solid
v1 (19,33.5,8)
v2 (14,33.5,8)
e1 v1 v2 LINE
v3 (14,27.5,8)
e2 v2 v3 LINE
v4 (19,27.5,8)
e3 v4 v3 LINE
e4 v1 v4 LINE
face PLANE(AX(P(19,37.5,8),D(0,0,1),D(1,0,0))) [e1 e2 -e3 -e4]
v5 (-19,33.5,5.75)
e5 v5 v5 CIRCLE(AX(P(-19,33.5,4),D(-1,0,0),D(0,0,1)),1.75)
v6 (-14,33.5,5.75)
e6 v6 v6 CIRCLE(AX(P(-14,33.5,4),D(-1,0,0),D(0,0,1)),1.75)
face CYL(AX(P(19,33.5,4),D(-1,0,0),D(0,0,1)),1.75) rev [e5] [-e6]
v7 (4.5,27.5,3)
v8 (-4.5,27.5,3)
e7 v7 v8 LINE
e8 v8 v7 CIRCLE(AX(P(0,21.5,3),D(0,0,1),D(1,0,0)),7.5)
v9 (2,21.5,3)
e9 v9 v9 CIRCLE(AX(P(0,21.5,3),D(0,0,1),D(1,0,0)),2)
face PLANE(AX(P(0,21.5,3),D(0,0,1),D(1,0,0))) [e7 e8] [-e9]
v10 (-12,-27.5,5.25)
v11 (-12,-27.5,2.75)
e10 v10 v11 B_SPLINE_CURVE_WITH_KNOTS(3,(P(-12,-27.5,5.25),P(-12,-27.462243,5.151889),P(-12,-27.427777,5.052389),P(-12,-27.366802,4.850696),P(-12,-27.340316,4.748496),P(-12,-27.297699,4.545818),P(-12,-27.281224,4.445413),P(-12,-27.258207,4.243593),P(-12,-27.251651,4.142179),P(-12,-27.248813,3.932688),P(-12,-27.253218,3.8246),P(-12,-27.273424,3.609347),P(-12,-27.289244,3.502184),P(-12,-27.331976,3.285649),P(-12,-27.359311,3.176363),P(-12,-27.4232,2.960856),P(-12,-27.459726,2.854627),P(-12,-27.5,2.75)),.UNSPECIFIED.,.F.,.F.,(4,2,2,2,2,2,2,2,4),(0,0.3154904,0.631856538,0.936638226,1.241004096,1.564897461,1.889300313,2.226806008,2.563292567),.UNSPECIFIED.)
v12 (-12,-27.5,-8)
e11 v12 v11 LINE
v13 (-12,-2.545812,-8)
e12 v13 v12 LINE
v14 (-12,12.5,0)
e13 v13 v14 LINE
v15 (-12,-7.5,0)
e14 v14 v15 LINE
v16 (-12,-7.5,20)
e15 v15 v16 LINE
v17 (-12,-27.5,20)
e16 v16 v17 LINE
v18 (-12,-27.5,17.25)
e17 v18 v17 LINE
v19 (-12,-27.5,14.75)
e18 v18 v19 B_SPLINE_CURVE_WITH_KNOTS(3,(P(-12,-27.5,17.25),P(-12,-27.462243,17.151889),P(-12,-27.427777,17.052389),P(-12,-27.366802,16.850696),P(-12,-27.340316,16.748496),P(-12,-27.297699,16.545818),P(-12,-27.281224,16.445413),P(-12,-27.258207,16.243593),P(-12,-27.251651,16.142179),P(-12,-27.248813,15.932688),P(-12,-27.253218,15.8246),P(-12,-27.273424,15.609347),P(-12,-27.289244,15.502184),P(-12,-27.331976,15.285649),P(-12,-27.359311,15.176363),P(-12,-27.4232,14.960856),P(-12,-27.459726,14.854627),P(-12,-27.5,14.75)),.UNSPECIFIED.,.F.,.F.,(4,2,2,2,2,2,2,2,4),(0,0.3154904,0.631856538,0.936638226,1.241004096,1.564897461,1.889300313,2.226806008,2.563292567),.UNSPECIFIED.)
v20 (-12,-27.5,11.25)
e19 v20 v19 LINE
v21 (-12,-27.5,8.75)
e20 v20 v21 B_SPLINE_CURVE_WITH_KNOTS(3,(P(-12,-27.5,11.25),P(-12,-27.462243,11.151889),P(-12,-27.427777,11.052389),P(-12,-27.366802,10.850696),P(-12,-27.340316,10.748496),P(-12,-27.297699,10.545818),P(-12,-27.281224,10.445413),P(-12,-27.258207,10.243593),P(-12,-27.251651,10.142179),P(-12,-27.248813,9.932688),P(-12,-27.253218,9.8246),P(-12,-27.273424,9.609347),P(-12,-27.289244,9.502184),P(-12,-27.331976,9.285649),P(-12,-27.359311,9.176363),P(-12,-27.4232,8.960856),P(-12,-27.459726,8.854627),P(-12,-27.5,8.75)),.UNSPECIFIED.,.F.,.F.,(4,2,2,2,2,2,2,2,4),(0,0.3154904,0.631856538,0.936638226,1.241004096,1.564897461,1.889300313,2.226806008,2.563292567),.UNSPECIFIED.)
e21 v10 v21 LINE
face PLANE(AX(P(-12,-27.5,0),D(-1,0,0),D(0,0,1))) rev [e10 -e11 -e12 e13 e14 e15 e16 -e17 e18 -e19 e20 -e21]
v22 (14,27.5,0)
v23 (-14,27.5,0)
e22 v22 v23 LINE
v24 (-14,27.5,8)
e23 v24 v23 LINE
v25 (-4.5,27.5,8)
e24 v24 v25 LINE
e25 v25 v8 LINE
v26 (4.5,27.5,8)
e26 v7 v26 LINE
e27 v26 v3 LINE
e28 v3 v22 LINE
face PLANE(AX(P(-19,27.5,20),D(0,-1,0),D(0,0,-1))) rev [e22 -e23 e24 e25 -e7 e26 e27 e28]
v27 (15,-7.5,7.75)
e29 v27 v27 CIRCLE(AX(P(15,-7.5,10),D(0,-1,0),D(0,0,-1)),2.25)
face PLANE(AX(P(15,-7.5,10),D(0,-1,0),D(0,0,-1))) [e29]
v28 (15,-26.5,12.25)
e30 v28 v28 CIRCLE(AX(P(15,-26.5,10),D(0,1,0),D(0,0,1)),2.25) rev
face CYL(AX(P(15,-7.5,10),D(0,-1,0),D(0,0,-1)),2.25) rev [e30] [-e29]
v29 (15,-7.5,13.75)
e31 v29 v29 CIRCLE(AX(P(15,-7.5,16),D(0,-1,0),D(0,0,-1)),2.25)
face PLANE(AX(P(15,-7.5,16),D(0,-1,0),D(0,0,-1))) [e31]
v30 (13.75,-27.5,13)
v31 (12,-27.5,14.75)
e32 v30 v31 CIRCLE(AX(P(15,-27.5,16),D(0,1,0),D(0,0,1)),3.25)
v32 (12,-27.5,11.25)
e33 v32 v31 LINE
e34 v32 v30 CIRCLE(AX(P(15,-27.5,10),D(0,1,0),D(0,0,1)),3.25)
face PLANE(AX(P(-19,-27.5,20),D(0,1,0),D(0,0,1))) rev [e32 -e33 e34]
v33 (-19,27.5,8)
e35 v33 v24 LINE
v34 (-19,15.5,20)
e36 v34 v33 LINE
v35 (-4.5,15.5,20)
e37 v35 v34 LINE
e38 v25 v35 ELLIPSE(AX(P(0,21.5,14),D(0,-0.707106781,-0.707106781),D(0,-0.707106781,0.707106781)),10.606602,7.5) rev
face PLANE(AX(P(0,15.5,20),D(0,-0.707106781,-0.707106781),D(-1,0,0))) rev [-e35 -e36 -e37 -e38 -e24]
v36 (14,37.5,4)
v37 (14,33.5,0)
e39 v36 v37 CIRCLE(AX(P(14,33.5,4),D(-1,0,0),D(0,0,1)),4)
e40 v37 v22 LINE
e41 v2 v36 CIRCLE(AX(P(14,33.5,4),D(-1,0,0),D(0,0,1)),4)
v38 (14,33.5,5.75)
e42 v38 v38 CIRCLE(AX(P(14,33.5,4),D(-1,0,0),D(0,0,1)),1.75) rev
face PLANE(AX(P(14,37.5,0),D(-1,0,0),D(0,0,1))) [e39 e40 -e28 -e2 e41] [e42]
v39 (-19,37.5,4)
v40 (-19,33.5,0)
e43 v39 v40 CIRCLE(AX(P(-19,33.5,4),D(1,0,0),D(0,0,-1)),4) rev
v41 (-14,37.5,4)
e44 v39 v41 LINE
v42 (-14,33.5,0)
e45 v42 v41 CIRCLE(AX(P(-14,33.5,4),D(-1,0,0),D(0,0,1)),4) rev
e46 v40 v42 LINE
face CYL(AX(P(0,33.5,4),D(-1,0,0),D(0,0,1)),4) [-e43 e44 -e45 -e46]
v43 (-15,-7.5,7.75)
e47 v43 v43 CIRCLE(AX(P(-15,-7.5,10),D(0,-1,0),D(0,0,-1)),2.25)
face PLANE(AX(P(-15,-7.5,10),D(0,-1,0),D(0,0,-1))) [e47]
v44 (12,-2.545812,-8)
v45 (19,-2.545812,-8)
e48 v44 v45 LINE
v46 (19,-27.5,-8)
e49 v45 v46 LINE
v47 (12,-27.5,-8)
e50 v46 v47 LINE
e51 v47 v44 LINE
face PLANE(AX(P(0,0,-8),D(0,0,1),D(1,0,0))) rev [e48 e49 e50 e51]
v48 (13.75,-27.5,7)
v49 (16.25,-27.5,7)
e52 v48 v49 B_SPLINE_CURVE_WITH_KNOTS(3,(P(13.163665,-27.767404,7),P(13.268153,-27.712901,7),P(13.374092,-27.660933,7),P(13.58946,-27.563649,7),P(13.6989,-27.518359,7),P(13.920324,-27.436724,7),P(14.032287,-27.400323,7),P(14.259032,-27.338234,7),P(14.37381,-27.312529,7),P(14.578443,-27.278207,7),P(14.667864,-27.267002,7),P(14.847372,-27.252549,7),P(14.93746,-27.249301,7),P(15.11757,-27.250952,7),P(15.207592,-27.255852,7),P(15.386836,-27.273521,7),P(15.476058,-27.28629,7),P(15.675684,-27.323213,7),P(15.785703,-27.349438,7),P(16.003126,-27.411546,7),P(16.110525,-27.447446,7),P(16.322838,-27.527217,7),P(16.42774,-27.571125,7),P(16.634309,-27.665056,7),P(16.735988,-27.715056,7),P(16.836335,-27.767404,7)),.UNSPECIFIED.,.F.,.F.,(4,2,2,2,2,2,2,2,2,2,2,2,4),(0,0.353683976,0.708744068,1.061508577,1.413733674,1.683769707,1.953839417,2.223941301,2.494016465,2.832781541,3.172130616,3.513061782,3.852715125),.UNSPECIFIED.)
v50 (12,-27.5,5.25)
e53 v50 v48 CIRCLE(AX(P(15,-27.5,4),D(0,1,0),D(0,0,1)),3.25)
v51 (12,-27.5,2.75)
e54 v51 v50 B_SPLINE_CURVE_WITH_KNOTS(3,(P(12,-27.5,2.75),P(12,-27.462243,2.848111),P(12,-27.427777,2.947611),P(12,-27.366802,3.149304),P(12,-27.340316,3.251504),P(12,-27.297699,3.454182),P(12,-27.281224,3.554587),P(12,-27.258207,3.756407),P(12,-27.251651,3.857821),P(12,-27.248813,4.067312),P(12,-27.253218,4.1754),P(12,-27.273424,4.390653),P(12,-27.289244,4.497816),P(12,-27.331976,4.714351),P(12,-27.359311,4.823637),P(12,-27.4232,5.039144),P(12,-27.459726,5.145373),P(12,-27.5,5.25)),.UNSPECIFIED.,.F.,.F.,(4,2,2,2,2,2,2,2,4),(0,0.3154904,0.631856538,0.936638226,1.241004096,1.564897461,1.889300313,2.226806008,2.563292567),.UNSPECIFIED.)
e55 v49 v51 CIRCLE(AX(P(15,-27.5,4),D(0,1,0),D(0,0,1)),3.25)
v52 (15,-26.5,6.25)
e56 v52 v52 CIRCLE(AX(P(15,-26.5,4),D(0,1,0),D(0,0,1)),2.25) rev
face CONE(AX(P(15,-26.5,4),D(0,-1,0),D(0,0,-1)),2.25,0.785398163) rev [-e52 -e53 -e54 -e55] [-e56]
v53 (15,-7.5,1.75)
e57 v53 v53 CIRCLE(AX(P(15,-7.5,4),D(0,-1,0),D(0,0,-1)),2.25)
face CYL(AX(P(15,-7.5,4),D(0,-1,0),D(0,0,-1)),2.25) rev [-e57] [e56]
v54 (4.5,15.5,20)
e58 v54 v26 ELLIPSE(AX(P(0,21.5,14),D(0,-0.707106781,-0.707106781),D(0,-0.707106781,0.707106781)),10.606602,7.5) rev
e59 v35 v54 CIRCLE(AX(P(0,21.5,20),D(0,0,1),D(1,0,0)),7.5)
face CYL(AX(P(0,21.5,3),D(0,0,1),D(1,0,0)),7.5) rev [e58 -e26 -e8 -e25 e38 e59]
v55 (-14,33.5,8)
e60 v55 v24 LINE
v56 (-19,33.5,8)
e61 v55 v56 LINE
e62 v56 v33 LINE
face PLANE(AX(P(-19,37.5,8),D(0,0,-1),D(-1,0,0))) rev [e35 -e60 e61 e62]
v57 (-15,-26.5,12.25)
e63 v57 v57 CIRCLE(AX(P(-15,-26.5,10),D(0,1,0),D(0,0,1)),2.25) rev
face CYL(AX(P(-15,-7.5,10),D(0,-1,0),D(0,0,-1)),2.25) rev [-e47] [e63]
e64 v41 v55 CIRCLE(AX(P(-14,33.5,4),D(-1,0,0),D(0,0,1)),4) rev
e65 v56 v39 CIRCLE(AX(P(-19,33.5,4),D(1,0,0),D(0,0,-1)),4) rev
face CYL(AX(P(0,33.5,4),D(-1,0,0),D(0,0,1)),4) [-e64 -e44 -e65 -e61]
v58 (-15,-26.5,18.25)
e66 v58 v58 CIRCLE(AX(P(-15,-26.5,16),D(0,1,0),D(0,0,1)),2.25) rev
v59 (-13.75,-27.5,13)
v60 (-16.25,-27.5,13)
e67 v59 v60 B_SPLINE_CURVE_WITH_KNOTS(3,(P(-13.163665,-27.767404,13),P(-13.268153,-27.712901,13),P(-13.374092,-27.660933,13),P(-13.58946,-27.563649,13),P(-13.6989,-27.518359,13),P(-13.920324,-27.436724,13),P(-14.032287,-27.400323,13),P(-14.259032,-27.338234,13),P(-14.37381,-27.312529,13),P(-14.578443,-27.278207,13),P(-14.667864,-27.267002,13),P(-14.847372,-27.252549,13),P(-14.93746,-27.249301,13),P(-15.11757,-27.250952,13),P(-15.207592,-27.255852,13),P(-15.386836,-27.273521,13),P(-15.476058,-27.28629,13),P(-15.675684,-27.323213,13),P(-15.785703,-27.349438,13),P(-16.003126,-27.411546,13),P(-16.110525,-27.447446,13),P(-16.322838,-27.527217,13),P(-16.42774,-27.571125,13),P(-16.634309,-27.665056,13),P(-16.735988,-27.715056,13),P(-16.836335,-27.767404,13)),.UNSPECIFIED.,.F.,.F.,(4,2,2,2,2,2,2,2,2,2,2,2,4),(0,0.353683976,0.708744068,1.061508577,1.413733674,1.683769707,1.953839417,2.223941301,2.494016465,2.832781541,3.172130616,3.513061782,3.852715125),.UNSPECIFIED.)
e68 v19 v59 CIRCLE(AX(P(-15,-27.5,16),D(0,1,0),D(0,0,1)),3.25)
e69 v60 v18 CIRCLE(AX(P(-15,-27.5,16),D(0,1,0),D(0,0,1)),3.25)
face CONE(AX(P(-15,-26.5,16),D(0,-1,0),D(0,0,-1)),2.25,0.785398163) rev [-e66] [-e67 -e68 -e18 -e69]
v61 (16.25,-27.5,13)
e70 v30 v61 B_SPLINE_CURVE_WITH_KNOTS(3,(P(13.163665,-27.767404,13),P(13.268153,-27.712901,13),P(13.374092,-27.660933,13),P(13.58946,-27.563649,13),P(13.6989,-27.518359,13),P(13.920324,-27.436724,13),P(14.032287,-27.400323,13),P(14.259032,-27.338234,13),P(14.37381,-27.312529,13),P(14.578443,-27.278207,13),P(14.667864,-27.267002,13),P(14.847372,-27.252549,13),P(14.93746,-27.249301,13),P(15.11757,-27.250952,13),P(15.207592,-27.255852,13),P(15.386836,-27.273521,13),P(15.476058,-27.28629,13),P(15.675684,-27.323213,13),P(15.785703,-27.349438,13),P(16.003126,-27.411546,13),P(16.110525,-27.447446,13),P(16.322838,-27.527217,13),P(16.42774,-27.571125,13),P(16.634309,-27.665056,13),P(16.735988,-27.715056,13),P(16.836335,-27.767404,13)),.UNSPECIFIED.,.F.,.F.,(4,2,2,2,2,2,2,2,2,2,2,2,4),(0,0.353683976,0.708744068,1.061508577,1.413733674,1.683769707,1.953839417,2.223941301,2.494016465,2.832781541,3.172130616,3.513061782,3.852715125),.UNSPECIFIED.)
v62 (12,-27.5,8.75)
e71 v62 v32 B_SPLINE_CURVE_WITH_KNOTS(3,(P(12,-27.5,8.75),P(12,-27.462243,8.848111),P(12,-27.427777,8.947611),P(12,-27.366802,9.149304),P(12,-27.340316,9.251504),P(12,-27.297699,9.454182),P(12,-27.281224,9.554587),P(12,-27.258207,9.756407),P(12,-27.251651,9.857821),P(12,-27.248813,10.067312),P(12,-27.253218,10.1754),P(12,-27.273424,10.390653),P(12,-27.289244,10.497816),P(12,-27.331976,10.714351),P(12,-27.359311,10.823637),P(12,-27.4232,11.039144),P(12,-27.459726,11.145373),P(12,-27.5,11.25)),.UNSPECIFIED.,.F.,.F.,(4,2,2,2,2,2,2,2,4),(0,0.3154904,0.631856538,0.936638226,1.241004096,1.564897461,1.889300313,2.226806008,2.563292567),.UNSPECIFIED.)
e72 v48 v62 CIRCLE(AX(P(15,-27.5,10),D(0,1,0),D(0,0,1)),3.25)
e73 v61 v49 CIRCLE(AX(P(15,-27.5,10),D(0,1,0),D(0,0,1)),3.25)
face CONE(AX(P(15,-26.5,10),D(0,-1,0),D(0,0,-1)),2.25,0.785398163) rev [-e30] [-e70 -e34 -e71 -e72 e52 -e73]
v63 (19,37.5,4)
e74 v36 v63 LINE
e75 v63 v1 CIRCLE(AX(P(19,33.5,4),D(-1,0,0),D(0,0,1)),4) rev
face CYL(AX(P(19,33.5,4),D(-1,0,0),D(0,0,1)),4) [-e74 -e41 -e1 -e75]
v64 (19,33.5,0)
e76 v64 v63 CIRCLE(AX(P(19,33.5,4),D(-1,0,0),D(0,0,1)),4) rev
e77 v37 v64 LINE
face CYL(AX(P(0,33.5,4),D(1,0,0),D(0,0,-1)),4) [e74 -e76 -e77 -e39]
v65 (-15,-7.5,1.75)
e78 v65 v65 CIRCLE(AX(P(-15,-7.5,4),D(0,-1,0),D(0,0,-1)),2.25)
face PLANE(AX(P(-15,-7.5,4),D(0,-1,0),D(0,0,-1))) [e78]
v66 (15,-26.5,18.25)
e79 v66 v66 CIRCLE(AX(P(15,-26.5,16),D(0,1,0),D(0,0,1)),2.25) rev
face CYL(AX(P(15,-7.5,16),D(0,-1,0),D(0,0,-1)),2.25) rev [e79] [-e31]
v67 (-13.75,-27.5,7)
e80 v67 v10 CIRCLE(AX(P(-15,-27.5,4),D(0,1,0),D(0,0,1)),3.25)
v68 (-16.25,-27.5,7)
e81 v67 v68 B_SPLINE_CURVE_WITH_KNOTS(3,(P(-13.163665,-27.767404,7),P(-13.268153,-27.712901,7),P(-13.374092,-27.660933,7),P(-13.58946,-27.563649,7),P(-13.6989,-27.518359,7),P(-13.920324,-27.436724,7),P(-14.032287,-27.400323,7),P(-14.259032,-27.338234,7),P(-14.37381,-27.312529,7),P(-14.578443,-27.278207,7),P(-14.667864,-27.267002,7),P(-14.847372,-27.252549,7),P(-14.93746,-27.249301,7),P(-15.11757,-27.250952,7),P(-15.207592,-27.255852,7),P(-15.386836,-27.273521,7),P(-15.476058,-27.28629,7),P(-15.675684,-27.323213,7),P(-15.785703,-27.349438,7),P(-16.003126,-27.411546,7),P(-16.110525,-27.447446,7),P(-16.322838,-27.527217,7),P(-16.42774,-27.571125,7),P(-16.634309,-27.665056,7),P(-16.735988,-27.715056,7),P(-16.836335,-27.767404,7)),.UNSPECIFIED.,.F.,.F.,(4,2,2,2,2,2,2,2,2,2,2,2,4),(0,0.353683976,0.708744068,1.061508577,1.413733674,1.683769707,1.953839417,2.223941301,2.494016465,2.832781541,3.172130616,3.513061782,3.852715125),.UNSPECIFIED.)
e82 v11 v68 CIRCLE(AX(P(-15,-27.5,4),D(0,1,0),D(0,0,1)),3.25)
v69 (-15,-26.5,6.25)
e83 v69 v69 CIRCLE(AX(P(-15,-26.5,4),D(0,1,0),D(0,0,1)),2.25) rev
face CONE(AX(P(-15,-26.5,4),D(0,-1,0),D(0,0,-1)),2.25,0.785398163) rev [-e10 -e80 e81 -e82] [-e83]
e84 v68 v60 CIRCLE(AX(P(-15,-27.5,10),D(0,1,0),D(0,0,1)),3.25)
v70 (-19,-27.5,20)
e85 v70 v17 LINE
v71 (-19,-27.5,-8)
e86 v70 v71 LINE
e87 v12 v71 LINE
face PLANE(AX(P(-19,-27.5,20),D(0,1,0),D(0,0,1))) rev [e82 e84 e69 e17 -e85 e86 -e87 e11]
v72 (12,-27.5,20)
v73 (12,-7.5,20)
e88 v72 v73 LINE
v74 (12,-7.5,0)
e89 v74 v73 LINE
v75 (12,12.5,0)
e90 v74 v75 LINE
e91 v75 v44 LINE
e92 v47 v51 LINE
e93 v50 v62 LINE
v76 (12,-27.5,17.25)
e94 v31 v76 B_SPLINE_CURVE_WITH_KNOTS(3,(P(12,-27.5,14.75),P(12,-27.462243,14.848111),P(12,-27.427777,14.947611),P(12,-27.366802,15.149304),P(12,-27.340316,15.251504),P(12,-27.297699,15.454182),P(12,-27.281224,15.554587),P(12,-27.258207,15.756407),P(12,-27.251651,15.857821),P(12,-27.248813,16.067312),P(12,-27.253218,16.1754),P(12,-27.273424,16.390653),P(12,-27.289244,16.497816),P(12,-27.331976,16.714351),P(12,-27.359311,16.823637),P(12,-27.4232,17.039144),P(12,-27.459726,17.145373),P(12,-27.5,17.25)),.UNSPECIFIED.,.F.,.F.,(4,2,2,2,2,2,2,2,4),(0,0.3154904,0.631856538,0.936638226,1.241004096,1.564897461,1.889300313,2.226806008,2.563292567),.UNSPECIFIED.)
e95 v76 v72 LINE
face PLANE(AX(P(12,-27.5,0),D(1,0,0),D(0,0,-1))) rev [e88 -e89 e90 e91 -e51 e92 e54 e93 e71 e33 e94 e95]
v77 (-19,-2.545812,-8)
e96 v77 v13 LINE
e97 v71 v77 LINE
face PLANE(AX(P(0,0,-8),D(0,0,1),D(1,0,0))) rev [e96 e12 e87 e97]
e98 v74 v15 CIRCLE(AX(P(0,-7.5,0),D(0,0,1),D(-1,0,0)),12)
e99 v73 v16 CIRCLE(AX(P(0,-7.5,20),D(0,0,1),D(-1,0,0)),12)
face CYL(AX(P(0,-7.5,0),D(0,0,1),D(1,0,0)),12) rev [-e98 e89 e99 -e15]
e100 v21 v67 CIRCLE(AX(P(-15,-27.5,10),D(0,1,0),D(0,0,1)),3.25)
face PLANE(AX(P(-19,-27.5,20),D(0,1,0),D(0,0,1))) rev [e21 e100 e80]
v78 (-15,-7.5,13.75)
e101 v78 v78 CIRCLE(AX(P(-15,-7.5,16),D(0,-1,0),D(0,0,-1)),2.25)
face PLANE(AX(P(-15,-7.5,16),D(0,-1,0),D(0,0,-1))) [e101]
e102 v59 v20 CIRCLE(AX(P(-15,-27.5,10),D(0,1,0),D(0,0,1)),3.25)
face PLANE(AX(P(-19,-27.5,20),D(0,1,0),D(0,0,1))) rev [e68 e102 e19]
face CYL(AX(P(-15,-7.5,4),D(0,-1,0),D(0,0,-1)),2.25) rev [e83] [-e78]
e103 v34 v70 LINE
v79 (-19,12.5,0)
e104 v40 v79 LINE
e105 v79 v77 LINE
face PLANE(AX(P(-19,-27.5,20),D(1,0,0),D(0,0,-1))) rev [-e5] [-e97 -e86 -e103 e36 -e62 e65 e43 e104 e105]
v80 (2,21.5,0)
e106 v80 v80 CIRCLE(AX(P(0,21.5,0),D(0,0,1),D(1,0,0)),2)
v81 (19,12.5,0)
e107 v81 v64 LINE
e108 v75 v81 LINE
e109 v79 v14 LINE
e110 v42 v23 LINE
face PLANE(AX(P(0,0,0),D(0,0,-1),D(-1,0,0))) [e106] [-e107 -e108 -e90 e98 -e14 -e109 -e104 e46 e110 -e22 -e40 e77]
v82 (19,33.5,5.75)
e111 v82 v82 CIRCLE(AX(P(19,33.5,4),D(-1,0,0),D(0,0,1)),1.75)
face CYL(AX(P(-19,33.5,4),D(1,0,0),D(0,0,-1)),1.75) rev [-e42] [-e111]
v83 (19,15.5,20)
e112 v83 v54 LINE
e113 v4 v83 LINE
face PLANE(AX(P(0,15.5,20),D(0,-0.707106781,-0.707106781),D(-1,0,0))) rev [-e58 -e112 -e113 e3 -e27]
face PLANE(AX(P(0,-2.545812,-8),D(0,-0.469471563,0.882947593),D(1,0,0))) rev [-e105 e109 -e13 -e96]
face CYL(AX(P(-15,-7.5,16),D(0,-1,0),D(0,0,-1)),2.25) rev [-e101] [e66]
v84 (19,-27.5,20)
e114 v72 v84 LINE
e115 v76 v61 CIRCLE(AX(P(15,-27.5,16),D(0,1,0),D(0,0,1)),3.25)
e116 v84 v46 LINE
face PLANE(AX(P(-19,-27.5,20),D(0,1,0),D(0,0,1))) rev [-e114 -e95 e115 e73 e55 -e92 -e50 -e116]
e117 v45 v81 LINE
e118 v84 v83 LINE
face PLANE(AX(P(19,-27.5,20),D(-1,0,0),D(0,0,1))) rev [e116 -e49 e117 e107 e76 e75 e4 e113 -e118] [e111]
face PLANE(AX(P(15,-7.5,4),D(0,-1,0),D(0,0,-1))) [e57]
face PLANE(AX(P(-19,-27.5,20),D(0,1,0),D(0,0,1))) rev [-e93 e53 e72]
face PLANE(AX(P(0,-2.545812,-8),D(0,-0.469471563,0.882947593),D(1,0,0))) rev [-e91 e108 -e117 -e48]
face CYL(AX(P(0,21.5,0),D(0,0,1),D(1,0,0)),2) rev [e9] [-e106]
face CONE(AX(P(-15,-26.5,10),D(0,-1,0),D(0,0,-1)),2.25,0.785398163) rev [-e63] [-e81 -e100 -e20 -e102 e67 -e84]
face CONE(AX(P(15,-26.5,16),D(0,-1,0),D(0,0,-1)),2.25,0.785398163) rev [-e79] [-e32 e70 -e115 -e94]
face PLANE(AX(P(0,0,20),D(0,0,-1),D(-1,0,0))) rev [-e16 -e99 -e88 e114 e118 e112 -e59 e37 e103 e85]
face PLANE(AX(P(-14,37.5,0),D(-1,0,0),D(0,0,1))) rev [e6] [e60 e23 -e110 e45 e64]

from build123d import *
from OCP.BRepFilletAPI import BRepFilletAPI_MakeChamfer

# Parameters (mm, degrees)
SKETCH1_W               = 38
SKETCH1_H               = 55
BOSS_EXTRUDE1_DEPTH     = 20
CUT_EXTRUDE1_DEPTH      = 39.951893407
SKETCH3_R               = 2.25
CUT_EXTRUDE2_DEPTH      = 20
LPATTERN1_COUNT         = 3
LPATTERN1_PITCH         = 6
CHAMFER1_SIZE           = 12
SKETCH4_W               = 5
SKETCH4_H               = 8
BOSS_EXTRUDE2_DEPTH     = 10
FILLET1_R               = 4
SKETCH5_R               = 1.75
CUT_EXTRUDE3_DEPTH      = 58.010963858
FILLET1_OF_MIRROR1_R    = 4
CHAMFER2_SIZE           = 1
SKETCH6_R               = 7.5
CUT_EXTRUDE4_DEPTH      = 17
CUT_EXTRUDE5_DEPTH      = 46.345892868
CUT_EXTRUDE5_DEPTH_BACK = 46.345892868
SKETCH7_R               = 2
SKETCH8_W               = 7
SKETCH8_H               = 40
BOSS_EXTRUDE3_DEPTH     = 8
CHAMFER3_SIZE           = 15.045811723
CHAMFER3_SIZE_2         = 8


# Some blends are built 0.0001 mm under size
with BuildPart() as part:
    # Sketch1 → Boss-Extrude1 (new body)
    with BuildSketch(Plane.XY):
        Rectangle(SKETCH1_W, SKETCH1_H)
    extrude(amount=BOSS_EXTRUDE1_DEPTH)

    # Sketch2 → Cut-Extrude1 (cut, through all)
    with BuildSketch(Plane.XY.offset(20)):
        with BuildLine():
            Line((-12, -27.5), (12, -27.5))
            Line((12, -27.5), (12, -7.5))
            ThreePointArc((12, -7.5), (0, 4.5), (-12, -7.5))
            Line((-12, -7.5), (-12, -27.5))
        make_face()
    extrude(amount=-CUT_EXTRUDE1_DEPTH, mode=Mode.SUBTRACT)

    # Sketch3 → Cut-Extrude2 (cut)
    with BuildSketch(Plane.XZ.offset(27.5)):
        with Locations(Location((-15, 16, 0), (0, 0, 270))):
            Circle(SKETCH3_R)
        with Locations(Location((15, 16, 0), (0, 0, 270))):
            Circle(SKETCH3_R)
    cut_extrude2 = extrude(amount=-CUT_EXTRUDE2_DEPTH, mode=Mode.SUBTRACT)

    # LPattern1: Cut-Extrude2 ×3
    with Locations(*[(0, 0, -i * LPATTERN1_PITCH) for i in range(1, LPATTERN1_COUNT)]):
        add(cut_extrude2, mode=Mode.SUBTRACT)

    # Chamfer1
    chamfer1_edges = [part.edges().sort_by_distance(p)[0] for p in [
        (0, 27.5, 20),
    ]]
    chamfer(chamfer1_edges, length=CHAMFER1_SIZE)

    # Sketch4 → Boss-Extrude2 (add)
    with BuildSketch(Plane(origin=(0, 27.5, 0), x_dir=(1, 0, 0), z_dir=(0, 1, 0))):
        with Locations((-16.5, -4)):
            Rectangle(SKETCH4_W, SKETCH4_H)
    boss_extrude2 = extrude(amount=BOSS_EXTRUDE2_DEPTH)

    # Fillet1
    fillet1_edges = [part.edges().sort_by_distance(p)[0] for p in [
        (-16.5, 37.5, 0),
        (-16.5, 37.5, 8),
    ]]
    fillet(fillet1_edges, radius=FILLET1_R - 0.0001)  # a hair under: the kernel refuses the full size

    # Sketch5 → Cut-Extrude3 (cut, through all)
    with BuildSketch(Plane.ZY.offset(19)):
        with Locations((4, 33.5)):
            Circle(SKETCH5_R)
    cut_extrude3 = extrude(amount=-CUT_EXTRUDE3_DEPTH, mode=Mode.SUBTRACT)

    # Mirror1: Boss-Extrude2, Cut-Extrude3 across plane
    add(boss_extrude2.mirror(Plane(origin=(0, 0, 0), x_dir=(0, 0, 1), z_dir=(1, 0, 0))))
    add(cut_extrude3.mirror(Plane(origin=(0, 0, 0), x_dir=(0, 0, 1), z_dir=(1, 0, 0))), mode=Mode.SUBTRACT)

    # Fillet1 of Mirror1
    fillet1_of_mirror1_edges = [part.edges().sort_by_distance(p)[0] for p in [
        (16.5, 37.5, 0),
        (16.5, 37.5, 8),
    ]]
    fillet(fillet1_of_mirror1_edges, radius=FILLET1_OF_MIRROR1_R - 0.0001)  # a hair under: the kernel refuses the full size

    # Chamfer2
    # the kernel refuses this chamfer: 1 mm, written as the material it takes off along each edge
    with BuildSketch(Plane(origin=(-15, -27.5, 16), x_dir=(0, 0, -1), z_dir=(-1, 0, 0))) as chamfer2_piece_1:
        Polygon((2.25 + CHAMFER2_SIZE, 0), (2.25, -CHAMFER2_SIZE), (2.25, 0), align=None)
    revolve(axis=Axis((-15, -27.5, 16), (0, -1, 0)), mode=Mode.SUBTRACT)
    with BuildSketch(Plane(origin=(15, -27.5, 16), x_dir=(0, 0, -1), z_dir=(-1, 0, 0))) as chamfer2_piece_2:
        Polygon((2.25 + CHAMFER2_SIZE, 0), (2.25, -CHAMFER2_SIZE), (2.25, 0), align=None)
    revolve(axis=Axis((15, -27.5, 16), (0, -1, 0)), mode=Mode.SUBTRACT)
    with BuildSketch(Plane(origin=(-15, -27.5, 10), x_dir=(0, 0, -1), z_dir=(-1, 0, 0))) as chamfer2_piece_3:
        Polygon((2.25 + CHAMFER2_SIZE, 0), (2.25, -CHAMFER2_SIZE), (2.25, 0), align=None)
    revolve(axis=Axis((-15, -27.5, 10), (0, -1, 0)), mode=Mode.SUBTRACT)
    with BuildSketch(Plane(origin=(-15, -27.5, 4), x_dir=(0, 0, -1), z_dir=(-1, 0, 0))) as chamfer2_piece_4:
        Polygon((2.25 + CHAMFER2_SIZE, 0), (2.25, -CHAMFER2_SIZE), (2.25, 0), align=None)
    revolve(axis=Axis((-15, -27.5, 4), (0, -1, 0)), mode=Mode.SUBTRACT)
    with BuildSketch(Plane(origin=(15, -27.5, 10), x_dir=(0, 0, -1), z_dir=(-1, 0, 0))) as chamfer2_piece_5:
        Polygon((2.25 + CHAMFER2_SIZE, 0), (2.25, -CHAMFER2_SIZE), (2.25, 0), align=None)
    revolve(axis=Axis((15, -27.5, 10), (0, -1, 0)), mode=Mode.SUBTRACT)
    with BuildSketch(Plane(origin=(15, -27.5, 4), x_dir=(0, 0, -1), z_dir=(-1, 0, 0))) as chamfer2_piece_6:
        Polygon((2.25 + CHAMFER2_SIZE, 0), (2.25, -CHAMFER2_SIZE), (2.25, 0), align=None)
    revolve(axis=Axis((15, -27.5, 4), (0, -1, 0)), mode=Mode.SUBTRACT)

    # Sketch6 → Cut-Extrude4 (cut)
    with BuildSketch(Plane.XY.offset(20)):
        with Locations((0, 21.5)):
            Circle(SKETCH6_R)
    extrude(amount=-CUT_EXTRUDE4_DEPTH, mode=Mode.SUBTRACT)

    # Sketch7 → Cut-Extrude5 (cut, two sides: drawn at the far end of the back side and taken through both)
    with BuildSketch(Plane.XY.offset(3).offset(-CUT_EXTRUDE5_DEPTH_BACK)):
        with Locations((0, 21.5)):
            Circle(SKETCH7_R)
    extrude(amount=CUT_EXTRUDE5_DEPTH + CUT_EXTRUDE5_DEPTH_BACK, mode=Mode.SUBTRACT)

    # Sketch8 → Boss-Extrude3 (add)
    with BuildSketch(Plane(origin=(0, 0, 0), x_dir=(-1, 0, 0), z_dir=(0, 0, -1))):
        with Locations((-15.5, -7.5)):
            Rectangle(SKETCH8_W, SKETCH8_H)
        with Locations((15.5, -7.5)):
            Rectangle(SKETCH8_W, SKETCH8_H)
    extrude(amount=BOSS_EXTRUDE3_DEPTH)

    # Chamfer3
    chamfer3_edges_1 = [part.edges().sort_by_distance(p)[0] for p in [
        (-15.5, 12.5, -8),
    ]]
    chamfer3_side_1 = [part.faces().sort_by_distance(p)[0] for p in [
        (-15.5, 12.34, -8),
    ]]
    chamfer3_edges_2 = [part.edges().sort_by_distance(p)[0] for p in [
        (15.5, 12.5, -8),
    ]]
    chamfer3_side_2 = [part.faces().sort_by_distance(p)[0] for p in [
        (15.5, 12.34, -8),
    ]]
    chamfer3 = BRepFilletAPI_MakeChamfer(part.part.solid().wrapped)
    for e in chamfer3_edges_1:
        chamfer3.Add(CHAMFER3_SIZE - 0.0001, CHAMFER3_SIZE_2 - 0.0001, e.wrapped, chamfer3_side_1[0].wrapped)
    for e in chamfer3_edges_2:
        chamfer3.Add(CHAMFER3_SIZE - 0.0001, CHAMFER3_SIZE_2 - 0.0001, e.wrapped, chamfer3_side_2[0].wrapped)
    add(Compound.cast(chamfer3.Shape()), mode=Mode.REPLACE)  # a hair under: the kernel refuses the full size


solid = part.part
